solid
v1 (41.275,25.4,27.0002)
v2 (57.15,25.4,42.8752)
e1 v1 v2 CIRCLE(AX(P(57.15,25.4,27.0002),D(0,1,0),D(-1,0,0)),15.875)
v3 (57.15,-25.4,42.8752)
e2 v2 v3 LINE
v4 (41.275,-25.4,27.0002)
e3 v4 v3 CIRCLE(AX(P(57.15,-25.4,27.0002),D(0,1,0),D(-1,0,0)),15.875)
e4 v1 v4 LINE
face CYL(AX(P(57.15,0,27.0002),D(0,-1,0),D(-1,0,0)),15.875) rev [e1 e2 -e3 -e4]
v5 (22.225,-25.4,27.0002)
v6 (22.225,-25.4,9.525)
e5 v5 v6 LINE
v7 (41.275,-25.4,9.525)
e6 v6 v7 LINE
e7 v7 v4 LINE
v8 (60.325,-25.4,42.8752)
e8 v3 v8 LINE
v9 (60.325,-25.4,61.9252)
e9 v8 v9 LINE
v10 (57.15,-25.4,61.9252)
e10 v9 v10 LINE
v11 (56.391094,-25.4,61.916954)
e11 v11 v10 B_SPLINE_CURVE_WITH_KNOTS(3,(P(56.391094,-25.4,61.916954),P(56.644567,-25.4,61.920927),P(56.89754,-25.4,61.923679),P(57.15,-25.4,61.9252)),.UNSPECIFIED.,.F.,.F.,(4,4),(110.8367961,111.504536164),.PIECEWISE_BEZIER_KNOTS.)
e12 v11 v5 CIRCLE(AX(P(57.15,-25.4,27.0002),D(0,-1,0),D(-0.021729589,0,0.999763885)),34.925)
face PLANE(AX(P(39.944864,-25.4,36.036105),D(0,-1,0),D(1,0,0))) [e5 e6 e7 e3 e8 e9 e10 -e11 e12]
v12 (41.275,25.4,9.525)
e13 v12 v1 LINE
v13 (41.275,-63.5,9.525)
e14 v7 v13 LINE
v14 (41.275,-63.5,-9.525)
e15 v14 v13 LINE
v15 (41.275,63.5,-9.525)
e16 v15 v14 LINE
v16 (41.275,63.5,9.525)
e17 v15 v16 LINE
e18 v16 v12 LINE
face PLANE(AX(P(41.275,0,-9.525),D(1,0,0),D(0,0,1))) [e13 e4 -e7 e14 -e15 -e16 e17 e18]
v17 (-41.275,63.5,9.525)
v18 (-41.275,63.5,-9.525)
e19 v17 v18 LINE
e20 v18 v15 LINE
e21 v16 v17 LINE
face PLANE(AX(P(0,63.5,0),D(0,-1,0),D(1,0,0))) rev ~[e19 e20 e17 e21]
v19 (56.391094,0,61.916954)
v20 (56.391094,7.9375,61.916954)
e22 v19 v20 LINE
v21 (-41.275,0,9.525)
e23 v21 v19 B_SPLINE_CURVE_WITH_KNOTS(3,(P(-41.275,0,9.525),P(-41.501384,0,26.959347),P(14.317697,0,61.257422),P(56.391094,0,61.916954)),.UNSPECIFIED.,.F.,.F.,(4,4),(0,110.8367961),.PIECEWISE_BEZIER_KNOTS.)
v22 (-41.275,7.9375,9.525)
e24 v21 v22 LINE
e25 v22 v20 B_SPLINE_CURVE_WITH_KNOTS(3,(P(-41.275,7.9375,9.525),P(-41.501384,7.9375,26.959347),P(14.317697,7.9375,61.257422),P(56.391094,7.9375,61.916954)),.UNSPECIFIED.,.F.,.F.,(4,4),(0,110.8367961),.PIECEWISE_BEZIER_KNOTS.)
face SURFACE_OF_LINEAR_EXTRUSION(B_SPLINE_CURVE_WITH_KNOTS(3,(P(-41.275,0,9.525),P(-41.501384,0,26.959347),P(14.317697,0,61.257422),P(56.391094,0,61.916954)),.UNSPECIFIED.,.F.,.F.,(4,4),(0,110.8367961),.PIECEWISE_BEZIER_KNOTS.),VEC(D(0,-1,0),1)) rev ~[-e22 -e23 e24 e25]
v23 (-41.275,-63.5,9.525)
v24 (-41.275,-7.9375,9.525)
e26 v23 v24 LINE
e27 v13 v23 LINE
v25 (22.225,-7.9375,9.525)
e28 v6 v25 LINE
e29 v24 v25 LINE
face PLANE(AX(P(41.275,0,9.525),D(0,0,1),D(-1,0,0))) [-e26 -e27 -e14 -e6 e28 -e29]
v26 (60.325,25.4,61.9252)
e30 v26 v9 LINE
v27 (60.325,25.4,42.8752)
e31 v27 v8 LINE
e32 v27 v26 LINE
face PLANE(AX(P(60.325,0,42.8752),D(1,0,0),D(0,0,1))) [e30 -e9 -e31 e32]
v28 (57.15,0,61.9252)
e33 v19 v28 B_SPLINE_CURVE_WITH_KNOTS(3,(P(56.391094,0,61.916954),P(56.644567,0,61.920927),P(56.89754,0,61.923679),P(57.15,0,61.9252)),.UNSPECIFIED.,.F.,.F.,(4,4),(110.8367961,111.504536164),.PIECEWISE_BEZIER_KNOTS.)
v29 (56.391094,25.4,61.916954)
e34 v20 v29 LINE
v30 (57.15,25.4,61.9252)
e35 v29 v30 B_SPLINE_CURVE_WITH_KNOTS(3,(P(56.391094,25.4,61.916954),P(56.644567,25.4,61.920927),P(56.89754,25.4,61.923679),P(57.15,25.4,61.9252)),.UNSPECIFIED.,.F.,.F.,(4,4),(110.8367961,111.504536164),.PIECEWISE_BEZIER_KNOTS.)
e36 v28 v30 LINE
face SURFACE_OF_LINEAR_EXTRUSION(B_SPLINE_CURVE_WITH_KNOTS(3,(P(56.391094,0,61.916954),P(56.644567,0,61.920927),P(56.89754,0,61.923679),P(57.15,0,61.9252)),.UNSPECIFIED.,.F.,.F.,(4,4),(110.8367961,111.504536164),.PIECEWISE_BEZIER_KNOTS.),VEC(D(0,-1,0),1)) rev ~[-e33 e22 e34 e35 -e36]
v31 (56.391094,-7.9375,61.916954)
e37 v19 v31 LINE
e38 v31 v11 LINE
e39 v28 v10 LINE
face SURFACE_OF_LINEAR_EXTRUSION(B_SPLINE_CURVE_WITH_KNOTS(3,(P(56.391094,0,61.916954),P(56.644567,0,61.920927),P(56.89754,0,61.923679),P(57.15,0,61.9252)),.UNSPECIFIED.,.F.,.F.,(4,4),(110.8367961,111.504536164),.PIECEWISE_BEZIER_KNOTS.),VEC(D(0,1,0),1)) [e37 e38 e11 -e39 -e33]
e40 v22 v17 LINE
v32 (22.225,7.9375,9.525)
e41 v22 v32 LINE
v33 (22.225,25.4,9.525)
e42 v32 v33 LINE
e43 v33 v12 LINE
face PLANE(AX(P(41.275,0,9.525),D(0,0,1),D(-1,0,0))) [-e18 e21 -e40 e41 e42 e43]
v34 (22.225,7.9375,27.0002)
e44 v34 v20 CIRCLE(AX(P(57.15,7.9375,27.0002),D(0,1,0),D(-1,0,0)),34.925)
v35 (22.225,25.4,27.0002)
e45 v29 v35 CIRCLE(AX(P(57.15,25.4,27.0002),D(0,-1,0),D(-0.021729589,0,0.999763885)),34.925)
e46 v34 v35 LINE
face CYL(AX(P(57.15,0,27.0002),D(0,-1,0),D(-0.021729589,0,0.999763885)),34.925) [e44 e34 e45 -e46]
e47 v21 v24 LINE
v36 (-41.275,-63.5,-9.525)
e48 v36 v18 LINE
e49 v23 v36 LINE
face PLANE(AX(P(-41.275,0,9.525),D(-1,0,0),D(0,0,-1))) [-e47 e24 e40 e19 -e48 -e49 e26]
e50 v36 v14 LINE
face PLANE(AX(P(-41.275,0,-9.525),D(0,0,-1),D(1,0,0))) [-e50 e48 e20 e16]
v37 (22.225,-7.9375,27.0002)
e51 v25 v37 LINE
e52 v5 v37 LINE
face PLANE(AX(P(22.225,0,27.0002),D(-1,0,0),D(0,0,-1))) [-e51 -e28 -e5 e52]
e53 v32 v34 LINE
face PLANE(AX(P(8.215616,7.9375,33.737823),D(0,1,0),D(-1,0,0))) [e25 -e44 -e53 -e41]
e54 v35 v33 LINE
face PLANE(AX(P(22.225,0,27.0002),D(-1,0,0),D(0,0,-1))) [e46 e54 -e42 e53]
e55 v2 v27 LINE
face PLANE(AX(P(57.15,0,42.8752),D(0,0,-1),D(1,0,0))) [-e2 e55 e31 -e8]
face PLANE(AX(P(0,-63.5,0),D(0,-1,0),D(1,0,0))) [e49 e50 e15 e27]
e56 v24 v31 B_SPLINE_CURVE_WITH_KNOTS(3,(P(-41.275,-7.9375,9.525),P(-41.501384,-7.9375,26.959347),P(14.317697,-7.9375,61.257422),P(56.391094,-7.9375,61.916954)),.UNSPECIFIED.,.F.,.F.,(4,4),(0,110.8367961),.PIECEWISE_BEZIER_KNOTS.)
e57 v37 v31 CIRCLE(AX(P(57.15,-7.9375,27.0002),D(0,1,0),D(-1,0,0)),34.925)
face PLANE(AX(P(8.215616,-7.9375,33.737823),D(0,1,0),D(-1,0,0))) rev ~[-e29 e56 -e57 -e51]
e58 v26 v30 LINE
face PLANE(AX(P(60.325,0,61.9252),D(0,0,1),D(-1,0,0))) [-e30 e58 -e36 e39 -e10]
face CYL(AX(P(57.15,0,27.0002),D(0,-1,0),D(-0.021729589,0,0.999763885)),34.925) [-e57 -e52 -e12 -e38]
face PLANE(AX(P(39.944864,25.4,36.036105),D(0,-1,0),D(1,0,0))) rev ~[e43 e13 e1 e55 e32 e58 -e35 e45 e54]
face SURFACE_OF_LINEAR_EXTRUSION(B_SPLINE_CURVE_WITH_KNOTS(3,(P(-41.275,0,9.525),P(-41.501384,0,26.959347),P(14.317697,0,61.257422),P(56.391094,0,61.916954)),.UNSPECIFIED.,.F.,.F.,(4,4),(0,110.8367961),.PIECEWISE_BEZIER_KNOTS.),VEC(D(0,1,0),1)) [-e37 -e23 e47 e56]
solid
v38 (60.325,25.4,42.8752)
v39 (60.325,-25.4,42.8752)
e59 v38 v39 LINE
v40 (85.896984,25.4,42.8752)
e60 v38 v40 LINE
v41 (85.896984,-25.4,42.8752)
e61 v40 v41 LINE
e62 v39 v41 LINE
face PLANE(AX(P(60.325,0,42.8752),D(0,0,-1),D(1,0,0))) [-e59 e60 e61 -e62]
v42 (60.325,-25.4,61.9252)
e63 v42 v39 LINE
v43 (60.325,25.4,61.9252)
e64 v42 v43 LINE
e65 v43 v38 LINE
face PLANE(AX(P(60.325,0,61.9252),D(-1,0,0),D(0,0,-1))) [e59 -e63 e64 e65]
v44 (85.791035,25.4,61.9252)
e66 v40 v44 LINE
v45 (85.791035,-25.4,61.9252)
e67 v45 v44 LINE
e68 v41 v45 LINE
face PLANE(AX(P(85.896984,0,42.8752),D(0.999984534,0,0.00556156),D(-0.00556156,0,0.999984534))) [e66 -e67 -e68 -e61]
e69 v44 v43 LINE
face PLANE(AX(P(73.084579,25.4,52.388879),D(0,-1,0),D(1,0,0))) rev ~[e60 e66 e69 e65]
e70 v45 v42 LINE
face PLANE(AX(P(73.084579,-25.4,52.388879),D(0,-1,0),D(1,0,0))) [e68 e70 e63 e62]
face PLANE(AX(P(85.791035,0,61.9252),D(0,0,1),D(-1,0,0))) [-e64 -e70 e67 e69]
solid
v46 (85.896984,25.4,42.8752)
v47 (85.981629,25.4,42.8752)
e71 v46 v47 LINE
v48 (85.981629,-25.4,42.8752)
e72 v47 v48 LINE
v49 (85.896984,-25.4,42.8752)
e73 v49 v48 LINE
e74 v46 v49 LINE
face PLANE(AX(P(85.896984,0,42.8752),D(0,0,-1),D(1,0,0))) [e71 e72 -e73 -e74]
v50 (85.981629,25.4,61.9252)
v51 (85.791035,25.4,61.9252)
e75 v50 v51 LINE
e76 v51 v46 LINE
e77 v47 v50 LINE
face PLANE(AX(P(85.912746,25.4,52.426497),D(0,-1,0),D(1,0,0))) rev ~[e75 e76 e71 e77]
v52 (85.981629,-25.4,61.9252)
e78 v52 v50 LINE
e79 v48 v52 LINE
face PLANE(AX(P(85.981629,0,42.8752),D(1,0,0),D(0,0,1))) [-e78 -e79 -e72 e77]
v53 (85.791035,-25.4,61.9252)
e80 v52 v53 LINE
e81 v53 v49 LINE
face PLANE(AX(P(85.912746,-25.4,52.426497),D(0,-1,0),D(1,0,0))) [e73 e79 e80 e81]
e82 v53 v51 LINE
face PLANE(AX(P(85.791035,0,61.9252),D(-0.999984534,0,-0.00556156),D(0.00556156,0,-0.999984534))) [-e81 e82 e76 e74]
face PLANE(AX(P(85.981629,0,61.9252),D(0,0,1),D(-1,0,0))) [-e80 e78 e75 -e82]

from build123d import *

# Parameters (mm, degrees)
F1_DEPTH = 63.5
F2_DEPTH = 25.4
F3_DEPTH = 7.9375
F4_DEPTH = 25.4


# Not quite as in the source:
# - a feature of the source that left no trace in its solid (it failed there, or was rolled back) is left out


with BuildPart() as f1:
    # F0 (on Front) → F1 (new body, symmetric)
    with BuildSketch(Plane.XZ):
        Polygon((-41.275, -9.525), (41.275, -9.525), (41.275, 9.525), (22.225, 9.525), (-41.275, 9.525), align=None)
    extrude(amount=F1_DEPTH, both=True)

    # F0 (on Front) → F2 (join, symmetric)
    with BuildSketch(Plane.XZ):
        with BuildLine():
            Line((22.225, 9.525), (41.275, 9.525))
            Line((41.275, 9.525), (41.275, 27.0002))
            ThreePointArc((41.275, 27.0002), (45.9246798487, 38.2255201513), (57.15, 42.8752))
            Line((57.15, 42.8752), (60.325, 42.8752))
            Line((60.325, 42.8752), (60.325, 61.9252))
            Line((60.325, 61.9252), (57.15, 61.9252))
            add(Edge.make_bspline(
                [(56.3910941137, 61.9169536701), (56.6445667291, 61.920927039), (56.8975404447, 61.9236794966), (57.15, 61.9252)],
                knots=[110.8367961001, 110.8367961001, 110.8367961001, 110.8367961001, 111.5045361635, 111.5045361635, 111.5045361635, 111.5045361635], degree=3))
            ThreePointArc((56.3910941137, 61.9169536701), (32.1874238801, 51.4261169421), (22.225, 27.0002))
            Line((22.225, 27.0002), (22.225, 9.525))
        make_face()
    extrude(amount=F2_DEPTH, both=True)

    # F0 (on Front) → F3 (join, symmetric)
    with BuildSketch(Plane.XZ):
        with BuildLine():
            add(Edge.make_bspline(
                [(-41.275, 9.525), (-41.5013838276, 26.9593473463), (14.3176973965, 61.2574223543), (56.3910941137, 61.9169536701)],
                knots=[0, 0, 0, 0, 110.8367961001, 110.8367961001, 110.8367961001, 110.8367961001], degree=3))
            Line((-41.275, 9.525), (22.225, 9.525))
            Line((22.225, 9.525), (22.225, 27.0002))
            ThreePointArc((22.225, 27.0002), (32.1874238801, 51.4261169421), (56.3910941137, 61.9169536701))
        make_face()
    extrude(amount=F3_DEPTH, both=True)


with BuildPart() as f2:
    # F0 (on Front) → F2, piece 2 (new body, symmetric)
    with BuildSketch(Plane.XZ):
        Polygon((85.7910350956, 61.9252), (85.8969844585, 42.8752), (85.9816285353, 42.8752), (85.9816285353, 61.9252), align=None)
    extrude(amount=F2_DEPTH, both=True)


with BuildPart() as f4:
    # F0 (on Front) → F4 (new body, symmetric)
    with BuildSketch(Plane.XZ):
        Polygon((60.325, 61.9252), (60.325, 42.8752), (85.8969844585, 42.8752), (85.7910350956, 61.9252), align=None)
    extrude(amount=F4_DEPTH, both=True)


solid = Compound([f1.part, f2.part, f4.part])
